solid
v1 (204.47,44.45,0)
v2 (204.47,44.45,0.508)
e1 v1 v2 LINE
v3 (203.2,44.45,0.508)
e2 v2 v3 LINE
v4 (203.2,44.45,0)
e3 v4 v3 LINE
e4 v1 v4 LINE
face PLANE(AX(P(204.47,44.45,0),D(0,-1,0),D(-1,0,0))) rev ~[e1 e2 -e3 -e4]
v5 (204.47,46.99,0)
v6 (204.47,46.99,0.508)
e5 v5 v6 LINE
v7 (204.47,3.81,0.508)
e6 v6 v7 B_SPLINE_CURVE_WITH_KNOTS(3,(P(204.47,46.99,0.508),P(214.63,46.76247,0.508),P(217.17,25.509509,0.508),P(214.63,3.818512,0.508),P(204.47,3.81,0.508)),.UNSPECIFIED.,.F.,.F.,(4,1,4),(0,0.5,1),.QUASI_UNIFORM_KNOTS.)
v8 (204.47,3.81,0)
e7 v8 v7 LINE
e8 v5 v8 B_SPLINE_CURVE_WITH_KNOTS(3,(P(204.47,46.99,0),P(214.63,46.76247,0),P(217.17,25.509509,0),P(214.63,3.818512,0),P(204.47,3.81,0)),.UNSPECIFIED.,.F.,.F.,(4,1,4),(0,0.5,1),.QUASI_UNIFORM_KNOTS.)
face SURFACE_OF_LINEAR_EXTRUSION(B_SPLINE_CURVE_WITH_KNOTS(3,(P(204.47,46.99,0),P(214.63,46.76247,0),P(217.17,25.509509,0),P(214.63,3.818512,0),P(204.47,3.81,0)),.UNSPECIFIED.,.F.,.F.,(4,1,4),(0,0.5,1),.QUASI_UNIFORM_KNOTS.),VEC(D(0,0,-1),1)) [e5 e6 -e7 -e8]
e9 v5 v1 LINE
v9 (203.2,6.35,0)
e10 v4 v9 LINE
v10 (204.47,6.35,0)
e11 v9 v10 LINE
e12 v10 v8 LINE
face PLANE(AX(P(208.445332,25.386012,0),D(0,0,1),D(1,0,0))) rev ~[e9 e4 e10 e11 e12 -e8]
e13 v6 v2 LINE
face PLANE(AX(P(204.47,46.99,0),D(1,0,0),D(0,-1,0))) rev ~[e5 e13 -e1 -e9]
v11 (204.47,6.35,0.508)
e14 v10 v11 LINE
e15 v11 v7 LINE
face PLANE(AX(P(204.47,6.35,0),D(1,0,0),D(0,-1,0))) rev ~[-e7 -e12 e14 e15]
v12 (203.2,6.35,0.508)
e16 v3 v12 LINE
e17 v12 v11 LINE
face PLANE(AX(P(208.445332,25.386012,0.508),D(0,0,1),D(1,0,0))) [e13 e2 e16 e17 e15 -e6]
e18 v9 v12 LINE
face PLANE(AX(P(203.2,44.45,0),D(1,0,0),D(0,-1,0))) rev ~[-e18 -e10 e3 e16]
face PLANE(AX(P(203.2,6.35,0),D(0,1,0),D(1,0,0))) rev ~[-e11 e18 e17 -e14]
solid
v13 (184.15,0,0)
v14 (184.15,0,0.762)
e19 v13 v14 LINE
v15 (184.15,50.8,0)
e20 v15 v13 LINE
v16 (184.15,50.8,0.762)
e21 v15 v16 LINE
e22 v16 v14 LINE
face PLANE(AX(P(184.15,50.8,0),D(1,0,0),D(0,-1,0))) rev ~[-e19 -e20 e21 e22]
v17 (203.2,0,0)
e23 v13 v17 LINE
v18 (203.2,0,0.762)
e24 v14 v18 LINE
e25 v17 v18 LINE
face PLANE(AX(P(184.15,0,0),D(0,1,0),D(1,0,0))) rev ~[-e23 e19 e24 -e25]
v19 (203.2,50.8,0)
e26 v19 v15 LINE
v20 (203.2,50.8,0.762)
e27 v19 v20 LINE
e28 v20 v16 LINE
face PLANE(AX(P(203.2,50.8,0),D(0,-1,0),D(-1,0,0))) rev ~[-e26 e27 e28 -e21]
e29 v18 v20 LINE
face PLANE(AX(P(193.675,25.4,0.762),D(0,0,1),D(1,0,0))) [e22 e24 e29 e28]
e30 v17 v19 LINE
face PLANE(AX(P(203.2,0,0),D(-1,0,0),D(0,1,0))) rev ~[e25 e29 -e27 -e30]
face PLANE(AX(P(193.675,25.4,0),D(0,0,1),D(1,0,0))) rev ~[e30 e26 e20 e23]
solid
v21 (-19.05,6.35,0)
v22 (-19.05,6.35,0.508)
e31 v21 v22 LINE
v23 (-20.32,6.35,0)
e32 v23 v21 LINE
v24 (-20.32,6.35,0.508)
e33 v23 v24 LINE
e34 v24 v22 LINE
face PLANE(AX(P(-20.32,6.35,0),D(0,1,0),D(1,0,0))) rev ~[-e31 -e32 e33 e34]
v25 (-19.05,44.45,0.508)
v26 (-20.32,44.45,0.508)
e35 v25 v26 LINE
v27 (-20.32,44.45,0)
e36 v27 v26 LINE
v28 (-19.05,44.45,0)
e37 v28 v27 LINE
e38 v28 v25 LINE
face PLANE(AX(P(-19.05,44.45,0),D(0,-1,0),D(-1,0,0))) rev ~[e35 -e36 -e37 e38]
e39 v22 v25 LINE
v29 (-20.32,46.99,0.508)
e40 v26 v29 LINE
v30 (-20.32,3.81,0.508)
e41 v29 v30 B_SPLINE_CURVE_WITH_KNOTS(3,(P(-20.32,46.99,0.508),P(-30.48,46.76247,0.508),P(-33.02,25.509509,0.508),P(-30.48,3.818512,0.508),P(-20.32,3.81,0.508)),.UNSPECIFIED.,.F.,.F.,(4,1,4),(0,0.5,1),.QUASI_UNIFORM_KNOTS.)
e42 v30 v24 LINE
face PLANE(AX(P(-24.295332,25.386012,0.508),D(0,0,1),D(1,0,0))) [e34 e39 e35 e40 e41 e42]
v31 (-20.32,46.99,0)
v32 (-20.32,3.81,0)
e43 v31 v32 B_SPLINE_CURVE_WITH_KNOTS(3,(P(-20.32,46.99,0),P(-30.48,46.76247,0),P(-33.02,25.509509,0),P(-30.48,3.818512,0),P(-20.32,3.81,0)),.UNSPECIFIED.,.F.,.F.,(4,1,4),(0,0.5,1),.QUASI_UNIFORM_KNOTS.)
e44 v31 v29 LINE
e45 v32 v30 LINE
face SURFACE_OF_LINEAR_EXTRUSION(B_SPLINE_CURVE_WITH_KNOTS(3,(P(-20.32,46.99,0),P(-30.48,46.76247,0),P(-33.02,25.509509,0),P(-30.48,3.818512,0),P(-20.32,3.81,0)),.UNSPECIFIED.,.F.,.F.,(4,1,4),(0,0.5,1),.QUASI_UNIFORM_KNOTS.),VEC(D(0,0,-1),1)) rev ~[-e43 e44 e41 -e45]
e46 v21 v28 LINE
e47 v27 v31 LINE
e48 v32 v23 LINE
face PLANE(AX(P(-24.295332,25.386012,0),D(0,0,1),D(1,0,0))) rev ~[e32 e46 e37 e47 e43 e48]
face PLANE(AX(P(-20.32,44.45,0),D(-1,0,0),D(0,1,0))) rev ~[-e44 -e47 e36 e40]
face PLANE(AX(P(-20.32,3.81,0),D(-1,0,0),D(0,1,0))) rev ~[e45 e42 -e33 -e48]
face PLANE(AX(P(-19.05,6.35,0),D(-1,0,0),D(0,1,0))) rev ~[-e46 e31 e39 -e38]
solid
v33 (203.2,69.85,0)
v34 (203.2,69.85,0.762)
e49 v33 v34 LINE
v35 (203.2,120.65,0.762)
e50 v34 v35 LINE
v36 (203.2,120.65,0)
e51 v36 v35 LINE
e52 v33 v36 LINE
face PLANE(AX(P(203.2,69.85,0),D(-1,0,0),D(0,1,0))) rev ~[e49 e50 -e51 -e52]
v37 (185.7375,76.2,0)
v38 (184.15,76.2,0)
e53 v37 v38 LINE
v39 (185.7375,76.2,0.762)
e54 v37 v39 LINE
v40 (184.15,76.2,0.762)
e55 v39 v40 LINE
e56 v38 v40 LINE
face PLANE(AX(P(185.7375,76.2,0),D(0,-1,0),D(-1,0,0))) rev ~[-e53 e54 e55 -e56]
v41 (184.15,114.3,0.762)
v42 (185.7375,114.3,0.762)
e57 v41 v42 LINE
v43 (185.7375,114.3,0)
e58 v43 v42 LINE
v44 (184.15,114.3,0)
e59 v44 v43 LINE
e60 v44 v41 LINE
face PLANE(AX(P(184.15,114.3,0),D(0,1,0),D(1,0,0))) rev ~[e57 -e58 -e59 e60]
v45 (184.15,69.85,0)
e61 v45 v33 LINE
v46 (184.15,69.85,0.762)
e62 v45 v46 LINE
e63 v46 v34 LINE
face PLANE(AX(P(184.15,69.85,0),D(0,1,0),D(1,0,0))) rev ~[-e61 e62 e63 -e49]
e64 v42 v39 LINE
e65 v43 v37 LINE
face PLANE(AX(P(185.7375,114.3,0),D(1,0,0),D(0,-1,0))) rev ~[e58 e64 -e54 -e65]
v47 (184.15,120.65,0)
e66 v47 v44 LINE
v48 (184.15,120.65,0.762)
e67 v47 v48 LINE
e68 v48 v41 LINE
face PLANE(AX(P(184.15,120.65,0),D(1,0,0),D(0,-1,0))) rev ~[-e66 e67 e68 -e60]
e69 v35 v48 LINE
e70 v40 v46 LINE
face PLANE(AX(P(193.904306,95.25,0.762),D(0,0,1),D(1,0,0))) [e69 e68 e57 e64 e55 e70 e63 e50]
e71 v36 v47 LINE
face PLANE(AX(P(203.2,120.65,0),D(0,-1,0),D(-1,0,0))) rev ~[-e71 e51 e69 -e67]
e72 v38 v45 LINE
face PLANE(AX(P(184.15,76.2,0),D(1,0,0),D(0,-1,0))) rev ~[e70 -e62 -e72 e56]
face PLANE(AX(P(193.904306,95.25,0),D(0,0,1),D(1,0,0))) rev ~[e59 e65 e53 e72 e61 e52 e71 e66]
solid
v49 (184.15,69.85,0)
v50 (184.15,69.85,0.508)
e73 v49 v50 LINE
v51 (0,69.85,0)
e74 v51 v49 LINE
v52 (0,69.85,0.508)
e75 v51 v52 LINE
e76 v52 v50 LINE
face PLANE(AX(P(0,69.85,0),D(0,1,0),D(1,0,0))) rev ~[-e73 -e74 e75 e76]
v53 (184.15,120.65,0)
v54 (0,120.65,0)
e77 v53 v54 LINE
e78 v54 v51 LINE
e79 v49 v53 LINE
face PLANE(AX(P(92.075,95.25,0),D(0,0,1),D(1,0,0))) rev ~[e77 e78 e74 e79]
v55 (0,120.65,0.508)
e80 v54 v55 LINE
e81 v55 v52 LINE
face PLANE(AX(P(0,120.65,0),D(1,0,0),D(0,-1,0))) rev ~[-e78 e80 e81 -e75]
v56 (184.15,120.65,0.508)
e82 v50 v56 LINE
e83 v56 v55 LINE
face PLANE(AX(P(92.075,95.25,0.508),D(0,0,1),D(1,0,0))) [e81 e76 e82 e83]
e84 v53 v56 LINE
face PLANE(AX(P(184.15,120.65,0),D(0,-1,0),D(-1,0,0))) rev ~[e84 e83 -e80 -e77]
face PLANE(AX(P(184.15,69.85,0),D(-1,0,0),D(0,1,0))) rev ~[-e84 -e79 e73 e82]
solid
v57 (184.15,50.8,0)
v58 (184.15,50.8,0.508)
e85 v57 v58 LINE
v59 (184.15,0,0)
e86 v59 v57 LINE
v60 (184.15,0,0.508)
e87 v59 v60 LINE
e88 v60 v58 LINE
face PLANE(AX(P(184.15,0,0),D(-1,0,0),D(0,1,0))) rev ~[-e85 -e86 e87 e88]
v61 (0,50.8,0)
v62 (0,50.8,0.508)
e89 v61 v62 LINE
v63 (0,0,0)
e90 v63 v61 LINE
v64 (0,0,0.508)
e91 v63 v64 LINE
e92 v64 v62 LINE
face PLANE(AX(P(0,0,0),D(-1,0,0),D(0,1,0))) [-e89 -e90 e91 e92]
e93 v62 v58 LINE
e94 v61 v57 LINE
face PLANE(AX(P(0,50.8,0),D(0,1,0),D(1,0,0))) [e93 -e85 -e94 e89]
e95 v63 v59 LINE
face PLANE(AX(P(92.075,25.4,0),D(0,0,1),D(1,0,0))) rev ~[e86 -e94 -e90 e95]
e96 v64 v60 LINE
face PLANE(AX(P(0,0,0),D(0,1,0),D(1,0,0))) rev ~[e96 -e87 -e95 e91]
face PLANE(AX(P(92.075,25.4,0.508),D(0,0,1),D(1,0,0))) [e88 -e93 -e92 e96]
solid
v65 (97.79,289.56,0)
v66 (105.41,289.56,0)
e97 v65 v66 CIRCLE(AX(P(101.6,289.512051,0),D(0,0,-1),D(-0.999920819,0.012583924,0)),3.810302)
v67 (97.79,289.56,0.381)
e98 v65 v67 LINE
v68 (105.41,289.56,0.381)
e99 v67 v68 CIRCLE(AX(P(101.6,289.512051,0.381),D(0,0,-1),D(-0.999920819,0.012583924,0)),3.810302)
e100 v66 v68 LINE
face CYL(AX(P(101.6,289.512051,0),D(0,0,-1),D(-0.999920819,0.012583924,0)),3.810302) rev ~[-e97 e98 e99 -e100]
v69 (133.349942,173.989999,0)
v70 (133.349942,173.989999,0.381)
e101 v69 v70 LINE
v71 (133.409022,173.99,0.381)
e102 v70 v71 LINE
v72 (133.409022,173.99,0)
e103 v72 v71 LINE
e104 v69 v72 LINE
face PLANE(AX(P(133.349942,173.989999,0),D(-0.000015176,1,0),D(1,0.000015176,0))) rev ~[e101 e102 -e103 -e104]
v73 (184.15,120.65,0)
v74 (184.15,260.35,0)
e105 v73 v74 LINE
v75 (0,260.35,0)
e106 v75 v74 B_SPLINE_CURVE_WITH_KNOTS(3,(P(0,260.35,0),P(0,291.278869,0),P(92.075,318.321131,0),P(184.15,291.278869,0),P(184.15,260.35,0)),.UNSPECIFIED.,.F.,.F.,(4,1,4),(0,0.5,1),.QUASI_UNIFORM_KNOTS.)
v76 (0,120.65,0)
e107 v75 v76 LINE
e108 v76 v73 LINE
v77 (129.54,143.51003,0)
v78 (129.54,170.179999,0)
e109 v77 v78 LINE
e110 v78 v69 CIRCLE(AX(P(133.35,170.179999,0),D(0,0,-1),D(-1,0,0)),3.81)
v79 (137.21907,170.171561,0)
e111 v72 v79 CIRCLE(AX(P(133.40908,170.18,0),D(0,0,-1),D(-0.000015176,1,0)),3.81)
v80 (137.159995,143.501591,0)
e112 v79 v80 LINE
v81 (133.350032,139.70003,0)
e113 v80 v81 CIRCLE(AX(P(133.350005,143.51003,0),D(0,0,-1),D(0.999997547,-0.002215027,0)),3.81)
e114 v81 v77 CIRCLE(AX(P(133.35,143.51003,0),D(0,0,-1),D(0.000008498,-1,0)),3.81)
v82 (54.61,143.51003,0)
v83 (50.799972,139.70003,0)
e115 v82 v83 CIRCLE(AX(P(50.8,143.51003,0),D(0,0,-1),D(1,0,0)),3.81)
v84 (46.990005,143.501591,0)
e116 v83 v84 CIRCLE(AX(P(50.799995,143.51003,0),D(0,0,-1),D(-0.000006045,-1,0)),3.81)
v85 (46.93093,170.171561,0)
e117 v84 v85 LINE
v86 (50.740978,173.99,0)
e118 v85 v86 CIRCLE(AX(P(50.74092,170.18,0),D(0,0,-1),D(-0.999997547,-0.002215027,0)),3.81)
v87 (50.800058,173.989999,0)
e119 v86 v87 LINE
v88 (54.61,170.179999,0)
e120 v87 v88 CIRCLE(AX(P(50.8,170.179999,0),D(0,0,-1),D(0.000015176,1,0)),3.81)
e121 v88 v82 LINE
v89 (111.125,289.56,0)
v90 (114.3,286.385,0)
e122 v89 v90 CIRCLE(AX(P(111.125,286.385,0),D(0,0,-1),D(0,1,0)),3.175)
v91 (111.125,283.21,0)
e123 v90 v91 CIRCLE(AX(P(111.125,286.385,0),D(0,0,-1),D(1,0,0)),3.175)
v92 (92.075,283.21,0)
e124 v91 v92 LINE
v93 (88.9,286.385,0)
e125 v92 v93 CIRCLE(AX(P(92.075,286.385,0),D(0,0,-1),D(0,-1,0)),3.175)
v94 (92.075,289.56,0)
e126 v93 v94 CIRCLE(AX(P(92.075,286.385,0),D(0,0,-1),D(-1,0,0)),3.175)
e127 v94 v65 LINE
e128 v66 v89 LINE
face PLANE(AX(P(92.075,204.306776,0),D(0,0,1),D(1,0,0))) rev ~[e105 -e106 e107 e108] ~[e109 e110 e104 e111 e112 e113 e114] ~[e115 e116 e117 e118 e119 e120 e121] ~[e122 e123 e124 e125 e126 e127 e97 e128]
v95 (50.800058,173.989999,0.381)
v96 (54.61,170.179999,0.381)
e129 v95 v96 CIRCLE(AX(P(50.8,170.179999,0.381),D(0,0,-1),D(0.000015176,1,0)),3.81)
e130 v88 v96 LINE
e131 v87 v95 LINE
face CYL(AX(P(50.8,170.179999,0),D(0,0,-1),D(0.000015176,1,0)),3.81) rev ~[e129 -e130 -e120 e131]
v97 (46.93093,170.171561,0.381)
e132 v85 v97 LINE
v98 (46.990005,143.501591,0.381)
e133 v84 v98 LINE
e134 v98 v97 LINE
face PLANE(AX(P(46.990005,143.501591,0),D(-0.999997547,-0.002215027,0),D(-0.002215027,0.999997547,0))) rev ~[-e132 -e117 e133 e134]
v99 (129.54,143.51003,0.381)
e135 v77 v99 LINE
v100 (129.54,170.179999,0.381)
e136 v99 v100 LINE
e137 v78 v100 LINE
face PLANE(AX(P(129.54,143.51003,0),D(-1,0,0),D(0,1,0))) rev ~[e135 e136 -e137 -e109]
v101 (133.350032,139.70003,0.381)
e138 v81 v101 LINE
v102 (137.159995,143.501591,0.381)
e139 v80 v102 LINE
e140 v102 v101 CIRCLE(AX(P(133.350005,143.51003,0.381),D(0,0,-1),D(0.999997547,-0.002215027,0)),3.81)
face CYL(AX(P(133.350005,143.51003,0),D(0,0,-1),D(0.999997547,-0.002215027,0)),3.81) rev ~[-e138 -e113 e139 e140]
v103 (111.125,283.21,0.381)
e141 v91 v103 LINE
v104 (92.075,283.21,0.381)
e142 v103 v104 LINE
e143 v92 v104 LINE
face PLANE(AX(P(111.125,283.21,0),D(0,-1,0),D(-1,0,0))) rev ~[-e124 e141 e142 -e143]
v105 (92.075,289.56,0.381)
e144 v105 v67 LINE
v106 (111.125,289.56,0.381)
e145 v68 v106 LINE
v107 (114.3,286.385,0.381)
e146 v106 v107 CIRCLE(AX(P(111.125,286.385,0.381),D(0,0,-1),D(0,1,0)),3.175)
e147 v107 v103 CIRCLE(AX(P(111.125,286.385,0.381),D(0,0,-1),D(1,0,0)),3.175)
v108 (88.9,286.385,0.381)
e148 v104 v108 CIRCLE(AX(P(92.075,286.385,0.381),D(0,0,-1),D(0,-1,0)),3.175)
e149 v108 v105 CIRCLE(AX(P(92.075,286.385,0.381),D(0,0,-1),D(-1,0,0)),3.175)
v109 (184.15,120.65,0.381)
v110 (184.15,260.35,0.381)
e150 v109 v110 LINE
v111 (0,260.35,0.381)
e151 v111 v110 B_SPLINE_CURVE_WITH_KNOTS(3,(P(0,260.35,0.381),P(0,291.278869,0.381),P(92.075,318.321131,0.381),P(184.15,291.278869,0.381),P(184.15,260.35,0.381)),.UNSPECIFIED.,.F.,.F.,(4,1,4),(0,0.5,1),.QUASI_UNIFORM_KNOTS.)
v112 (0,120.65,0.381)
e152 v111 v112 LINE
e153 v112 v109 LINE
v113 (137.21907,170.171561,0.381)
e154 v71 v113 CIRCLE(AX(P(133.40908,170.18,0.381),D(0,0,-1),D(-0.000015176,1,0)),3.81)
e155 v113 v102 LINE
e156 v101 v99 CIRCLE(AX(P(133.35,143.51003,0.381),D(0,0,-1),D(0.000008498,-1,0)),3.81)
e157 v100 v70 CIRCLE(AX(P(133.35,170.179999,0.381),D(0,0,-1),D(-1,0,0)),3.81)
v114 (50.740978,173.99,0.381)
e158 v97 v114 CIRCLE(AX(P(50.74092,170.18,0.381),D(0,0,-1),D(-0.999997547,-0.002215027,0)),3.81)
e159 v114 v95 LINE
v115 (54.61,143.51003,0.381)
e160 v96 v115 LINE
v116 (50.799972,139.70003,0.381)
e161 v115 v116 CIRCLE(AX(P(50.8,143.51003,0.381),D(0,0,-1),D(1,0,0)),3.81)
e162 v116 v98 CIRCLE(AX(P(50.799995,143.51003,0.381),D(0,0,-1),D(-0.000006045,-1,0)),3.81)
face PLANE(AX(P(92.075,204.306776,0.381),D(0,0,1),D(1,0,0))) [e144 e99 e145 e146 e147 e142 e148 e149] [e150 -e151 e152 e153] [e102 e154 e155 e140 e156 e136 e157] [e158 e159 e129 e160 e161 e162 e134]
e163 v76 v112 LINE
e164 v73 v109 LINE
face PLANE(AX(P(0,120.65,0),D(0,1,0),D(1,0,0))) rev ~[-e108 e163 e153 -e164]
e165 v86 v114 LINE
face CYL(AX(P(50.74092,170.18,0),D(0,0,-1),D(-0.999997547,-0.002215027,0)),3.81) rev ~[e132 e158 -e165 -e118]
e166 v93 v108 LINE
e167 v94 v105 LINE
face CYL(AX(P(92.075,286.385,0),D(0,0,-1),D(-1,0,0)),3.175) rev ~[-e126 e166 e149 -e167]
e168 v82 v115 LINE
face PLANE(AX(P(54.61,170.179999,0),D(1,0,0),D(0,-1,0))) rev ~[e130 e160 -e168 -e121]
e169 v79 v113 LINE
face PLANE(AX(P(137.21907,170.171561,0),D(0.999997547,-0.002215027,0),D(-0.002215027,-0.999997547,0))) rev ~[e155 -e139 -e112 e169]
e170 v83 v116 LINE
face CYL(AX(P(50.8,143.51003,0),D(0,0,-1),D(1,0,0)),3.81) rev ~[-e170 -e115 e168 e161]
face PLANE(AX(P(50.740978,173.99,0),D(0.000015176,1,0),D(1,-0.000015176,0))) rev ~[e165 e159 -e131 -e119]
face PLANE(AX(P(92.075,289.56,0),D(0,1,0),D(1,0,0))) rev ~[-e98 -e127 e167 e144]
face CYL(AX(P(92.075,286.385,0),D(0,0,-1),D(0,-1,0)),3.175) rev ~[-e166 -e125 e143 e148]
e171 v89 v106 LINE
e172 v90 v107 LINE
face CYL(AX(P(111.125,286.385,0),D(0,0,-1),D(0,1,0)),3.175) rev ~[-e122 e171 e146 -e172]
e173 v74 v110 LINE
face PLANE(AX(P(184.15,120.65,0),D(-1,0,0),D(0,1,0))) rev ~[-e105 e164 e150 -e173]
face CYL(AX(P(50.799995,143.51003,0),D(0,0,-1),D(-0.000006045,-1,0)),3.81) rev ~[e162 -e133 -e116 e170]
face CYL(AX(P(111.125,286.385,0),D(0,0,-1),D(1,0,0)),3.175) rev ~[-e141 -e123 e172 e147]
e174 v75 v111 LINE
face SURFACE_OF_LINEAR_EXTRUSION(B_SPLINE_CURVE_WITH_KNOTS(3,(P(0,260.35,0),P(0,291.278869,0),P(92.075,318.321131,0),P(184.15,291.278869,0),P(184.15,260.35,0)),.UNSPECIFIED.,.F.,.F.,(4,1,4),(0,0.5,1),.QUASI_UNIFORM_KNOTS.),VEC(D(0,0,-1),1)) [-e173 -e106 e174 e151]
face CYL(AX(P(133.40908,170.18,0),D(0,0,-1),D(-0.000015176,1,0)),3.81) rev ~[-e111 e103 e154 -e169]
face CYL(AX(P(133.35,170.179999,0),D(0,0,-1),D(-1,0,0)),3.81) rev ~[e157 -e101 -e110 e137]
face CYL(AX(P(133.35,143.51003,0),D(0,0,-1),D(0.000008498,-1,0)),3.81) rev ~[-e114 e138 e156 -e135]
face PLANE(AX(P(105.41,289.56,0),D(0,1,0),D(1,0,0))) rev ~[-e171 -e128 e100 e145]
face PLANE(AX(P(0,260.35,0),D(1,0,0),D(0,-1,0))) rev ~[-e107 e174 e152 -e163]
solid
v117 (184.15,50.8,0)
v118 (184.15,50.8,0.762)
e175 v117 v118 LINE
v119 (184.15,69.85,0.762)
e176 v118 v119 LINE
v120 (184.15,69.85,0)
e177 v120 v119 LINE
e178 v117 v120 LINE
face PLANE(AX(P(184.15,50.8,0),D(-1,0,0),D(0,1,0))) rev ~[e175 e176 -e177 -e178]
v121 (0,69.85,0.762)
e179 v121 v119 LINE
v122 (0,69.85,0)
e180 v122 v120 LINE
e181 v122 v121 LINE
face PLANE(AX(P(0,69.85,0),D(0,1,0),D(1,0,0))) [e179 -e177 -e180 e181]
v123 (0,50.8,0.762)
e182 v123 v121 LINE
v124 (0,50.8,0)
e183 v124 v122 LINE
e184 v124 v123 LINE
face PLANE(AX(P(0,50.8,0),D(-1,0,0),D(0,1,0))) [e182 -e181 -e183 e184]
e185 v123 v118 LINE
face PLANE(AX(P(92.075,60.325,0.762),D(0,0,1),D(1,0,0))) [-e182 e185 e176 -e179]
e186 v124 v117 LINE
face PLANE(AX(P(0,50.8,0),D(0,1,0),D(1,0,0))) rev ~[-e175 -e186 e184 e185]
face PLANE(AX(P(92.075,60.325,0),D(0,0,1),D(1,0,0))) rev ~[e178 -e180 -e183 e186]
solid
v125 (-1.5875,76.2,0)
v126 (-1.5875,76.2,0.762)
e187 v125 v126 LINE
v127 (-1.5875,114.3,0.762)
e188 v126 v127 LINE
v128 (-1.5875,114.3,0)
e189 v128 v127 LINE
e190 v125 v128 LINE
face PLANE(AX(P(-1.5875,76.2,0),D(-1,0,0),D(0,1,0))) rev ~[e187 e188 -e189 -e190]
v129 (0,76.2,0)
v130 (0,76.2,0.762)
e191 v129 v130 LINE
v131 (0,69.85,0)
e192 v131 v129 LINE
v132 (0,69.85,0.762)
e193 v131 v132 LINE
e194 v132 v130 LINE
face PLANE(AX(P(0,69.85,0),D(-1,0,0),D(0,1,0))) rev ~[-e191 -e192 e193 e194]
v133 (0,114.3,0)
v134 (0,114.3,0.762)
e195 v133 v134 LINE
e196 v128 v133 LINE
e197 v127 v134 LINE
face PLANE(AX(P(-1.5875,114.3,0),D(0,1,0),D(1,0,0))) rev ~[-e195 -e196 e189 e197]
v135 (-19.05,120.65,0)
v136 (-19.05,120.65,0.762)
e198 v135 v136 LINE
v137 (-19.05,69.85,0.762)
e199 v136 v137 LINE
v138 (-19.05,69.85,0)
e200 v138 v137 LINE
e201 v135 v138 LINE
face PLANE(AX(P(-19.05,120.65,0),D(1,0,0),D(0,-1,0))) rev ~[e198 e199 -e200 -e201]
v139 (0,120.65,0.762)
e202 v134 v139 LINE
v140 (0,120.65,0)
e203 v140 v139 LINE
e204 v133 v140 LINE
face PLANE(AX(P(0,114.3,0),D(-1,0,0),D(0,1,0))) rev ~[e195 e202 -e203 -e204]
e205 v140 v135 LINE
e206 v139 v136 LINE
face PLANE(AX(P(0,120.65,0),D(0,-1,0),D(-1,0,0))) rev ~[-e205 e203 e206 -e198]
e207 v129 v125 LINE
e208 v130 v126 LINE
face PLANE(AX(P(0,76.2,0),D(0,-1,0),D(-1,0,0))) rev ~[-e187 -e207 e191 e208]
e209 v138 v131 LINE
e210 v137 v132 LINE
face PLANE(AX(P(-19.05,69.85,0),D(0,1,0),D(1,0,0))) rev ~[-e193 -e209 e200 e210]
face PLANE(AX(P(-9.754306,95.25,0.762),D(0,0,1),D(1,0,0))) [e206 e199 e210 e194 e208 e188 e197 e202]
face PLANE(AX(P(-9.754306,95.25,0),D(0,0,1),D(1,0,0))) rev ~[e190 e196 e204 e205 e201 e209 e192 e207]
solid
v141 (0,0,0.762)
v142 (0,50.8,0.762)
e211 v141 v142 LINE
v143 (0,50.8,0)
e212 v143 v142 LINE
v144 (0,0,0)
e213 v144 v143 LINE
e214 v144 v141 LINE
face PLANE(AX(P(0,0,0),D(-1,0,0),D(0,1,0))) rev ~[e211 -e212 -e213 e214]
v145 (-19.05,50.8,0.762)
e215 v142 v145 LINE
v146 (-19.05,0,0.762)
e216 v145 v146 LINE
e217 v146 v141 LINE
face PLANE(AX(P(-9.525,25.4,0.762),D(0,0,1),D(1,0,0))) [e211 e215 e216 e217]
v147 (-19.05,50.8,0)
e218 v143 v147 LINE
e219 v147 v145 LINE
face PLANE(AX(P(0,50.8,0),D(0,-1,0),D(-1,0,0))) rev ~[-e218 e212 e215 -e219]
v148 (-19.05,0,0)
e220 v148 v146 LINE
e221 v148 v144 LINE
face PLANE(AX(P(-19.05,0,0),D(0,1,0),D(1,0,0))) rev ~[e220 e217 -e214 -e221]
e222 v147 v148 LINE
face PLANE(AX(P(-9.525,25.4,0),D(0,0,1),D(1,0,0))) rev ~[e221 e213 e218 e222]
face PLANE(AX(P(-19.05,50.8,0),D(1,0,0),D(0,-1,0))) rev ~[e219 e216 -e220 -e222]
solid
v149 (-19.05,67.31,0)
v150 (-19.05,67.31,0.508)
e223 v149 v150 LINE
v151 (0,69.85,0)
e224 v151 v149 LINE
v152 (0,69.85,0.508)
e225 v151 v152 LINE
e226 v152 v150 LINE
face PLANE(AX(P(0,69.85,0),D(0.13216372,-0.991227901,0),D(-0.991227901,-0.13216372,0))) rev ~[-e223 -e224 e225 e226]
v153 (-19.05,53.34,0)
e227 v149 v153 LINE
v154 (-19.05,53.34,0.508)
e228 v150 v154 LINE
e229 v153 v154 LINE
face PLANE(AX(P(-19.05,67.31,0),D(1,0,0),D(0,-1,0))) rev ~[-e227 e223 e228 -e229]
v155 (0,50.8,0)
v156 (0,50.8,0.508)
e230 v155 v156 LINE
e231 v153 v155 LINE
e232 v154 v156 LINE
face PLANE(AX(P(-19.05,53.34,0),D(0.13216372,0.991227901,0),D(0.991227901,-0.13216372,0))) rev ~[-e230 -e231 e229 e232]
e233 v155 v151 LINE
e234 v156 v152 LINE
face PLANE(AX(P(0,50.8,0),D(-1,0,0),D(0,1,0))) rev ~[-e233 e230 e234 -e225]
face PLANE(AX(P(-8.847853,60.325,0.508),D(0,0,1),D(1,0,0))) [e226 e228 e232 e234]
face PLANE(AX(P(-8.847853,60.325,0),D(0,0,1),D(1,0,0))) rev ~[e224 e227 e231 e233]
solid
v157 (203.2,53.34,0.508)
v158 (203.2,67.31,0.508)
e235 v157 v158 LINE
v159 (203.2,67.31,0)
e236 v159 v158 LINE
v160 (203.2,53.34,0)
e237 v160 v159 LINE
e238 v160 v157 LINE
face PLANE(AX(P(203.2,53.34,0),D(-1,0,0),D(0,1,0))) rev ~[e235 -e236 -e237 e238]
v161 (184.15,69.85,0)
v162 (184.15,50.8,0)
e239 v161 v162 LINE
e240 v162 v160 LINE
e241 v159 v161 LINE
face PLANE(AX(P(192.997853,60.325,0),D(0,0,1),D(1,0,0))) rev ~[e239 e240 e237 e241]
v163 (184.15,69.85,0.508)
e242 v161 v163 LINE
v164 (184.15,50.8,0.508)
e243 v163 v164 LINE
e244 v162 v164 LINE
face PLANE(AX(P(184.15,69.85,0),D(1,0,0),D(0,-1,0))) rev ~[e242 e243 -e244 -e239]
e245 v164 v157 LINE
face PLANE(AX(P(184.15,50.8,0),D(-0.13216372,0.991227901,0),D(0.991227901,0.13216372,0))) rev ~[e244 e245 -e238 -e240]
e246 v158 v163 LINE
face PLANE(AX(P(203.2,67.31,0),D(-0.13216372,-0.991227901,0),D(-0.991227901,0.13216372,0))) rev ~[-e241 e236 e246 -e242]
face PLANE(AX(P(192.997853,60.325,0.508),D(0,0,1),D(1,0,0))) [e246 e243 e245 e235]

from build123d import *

# Parameters (mm, degrees)
F0_W     = 184.15
F0_H     = 50.8
F1_DEPTH = 0.508
F0_H_2   = 19.05
F2_DEPTH = 0.762
F3_DEPTH = 0.381


# Not quite as in the source:
# - ends of sketch curves that miss each other by under 0.0002 mm in the source are joined


with BuildPart() as f1:
    # F0 (on Top) → F1 (new body)
    with BuildSketch(Plane.XY):
        with Locations((92.075, 25.4)):
            Rectangle(F0_W, F0_H)
    extrude(amount=F1_DEPTH)


with BuildPart() as f1b:
    # F0 (on Top) → F1, piece 2 (new body)
    with BuildSketch(Plane.XY):
        Polygon((-19.05, 53.34), (0, 50.8), (0, 69.85), (-19.05, 67.31), align=None)
    extrude(amount=F1_DEPTH)


with BuildPart() as f1c:
    # F0 (on Top) → F1, piece 3 (new body)
    with BuildSketch(Plane.XY):
        Polygon((184.15, 69.85), (184.15, 50.8), (203.2, 53.34), (203.2, 67.31), align=None)
    extrude(amount=F1_DEPTH)


with BuildPart() as f1d:
    # F0 (on Top) → F1, piece 4 (new body)
    with BuildSketch(Plane.XY):
        Polygon((0, 76.2), (0, 69.85), (184.15, 69.85), (184.15, 76.2), (184.15, 114.3), (184.15, 120.65), (0, 120.65), (0, 114.3), align=None)
    extrude(amount=F1_DEPTH)


with BuildPart() as f1e:
    # F0 (on Top) → F1, piece 5 (new body)
    with BuildSketch(Plane.XY):
        with BuildLine():
            Line((203.2, 44.45), (203.2, 6.35))
            Line((203.2, 6.35), (204.47, 6.35))
            Line((204.47, 6.35), (204.47, 3.81))
            add(Edge.make_bspline(
                [(204.47, 46.99), (214.63, 46.762470156), (217.17, 25.5095088242), (214.63, 3.8185121957), (204.47, 3.81)],
                knots=[0, 0, 0, 0, 0.5, 1, 1, 1, 1], degree=3))
            Line((204.47, 46.99), (204.47, 44.45))
            Line((204.47, 44.45), (203.2, 44.45))
        make_face()
    extrude(amount=F1_DEPTH)


with BuildPart() as f1f:
    # F0 (on Top) → F1, piece 6 (new body)
    with BuildSketch(Plane.XY):
        with BuildLine():
            Line((-19.05, 6.35), (-19.05, 44.45))
            Line((-19.05, 44.45), (-20.32, 44.45))
            Line((-20.32, 44.45), (-20.32, 46.99))
            add(Edge.make_bspline(
                [(-20.32, 46.99), (-30.48, 46.762470156), (-33.02, 25.5095088242), (-30.48, 3.8185121957), (-20.32, 3.81)],
                knots=[0, 0, 0, 0, 0.5, 1, 1, 1, 1], degree=3))
            Line((-20.32, 3.81), (-20.32, 6.35))
            Line((-20.32, 6.35), (-19.05, 6.35))
        make_face()
    extrude(amount=F1_DEPTH)


with BuildPart() as f2:
    # F0 (on Top) → F2 (new body)
    with BuildSketch(Plane.XY):
        with Locations((92.075, 60.325)):
            Rectangle(F0_W, F0_H_2)
    extrude(amount=F2_DEPTH)


with BuildPart() as f2b:
    # F0 (on Top) → F2, piece 2 (new body)
    with BuildSketch(Plane.XY):
        Polygon((184.15, 76.2), (184.15, 69.85), (203.2, 69.85), (203.2, 120.65), (184.15, 120.65), (184.15, 114.3), (185.7375, 114.3), (185.7375, 76.2), align=None)
    extrude(amount=F2_DEPTH)


with BuildPart() as f2c:
    # F0 (on Top) → F2, piece 3 (new body)
    with BuildSketch(Plane.XY):
        Polygon((184.15, 50.8), (184.15, 0), (203.2, 0), (203.2, 6.35), (203.2, 44.45), (203.2, 50.8), align=None)
    extrude(amount=F2_DEPTH)


with BuildPart() as f2d:
    # F0 (on Top) → F2, piece 4 (new body)
    with BuildSketch(Plane.XY):
        Polygon((-19.05, 0), (0, 0), (0, 50.8), (-19.05, 50.8), (-19.05, 44.45), (-19.05, 6.35), (-19.05, 3.81), align=None)
    extrude(amount=F2_DEPTH)


with BuildPart() as f2e:
    # F0 (on Top) → F2, piece 5 (new body)
    with BuildSketch(Plane.XY):
        Polygon((-19.05, 69.85), (0, 69.85), (0, 76.2), (-1.5875, 76.2), (-1.5875, 114.3), (0, 114.3), (0, 120.65), (-19.05, 120.65), align=None)
    extrude(amount=F2_DEPTH)


with BuildPart() as f3:
    # F0 (on Top) → F3 (new body)
    with BuildSketch(Plane.XY):
        with BuildLine():
            Line((0, 260.35), (0, 120.65))
            Line((0, 120.65), (184.15, 120.65))
            Line((184.15, 120.65), (184.15, 260.35))
            add(Edge.make_bspline(
                [(0, 260.35), (0, 291.2788689137), (92.075, 318.3211310863), (184.15, 291.2788689137), (184.15, 260.35)],
                knots=[0, 0, 0, 0, 0.5, 1, 1, 1, 1], degree=3))
        make_face()
        with BuildLine():
            ThreePointArc((54.61, 143.5100303088), (53.4940670417, 140.8159436779), (50.7999722968, 139.7000303089))
            ThreePointArc((50.7999722968, 139.7000303089), (48.1088940654, 140.8129811804), (46.9900046733, 143.5015910564))
            Line((46.9900046733, 143.5015910564), (46.9309298286, 170.171560748))
            ThreePointArc((46.9309298286, 170.171560748), (48.0438819902, 172.8711119219), (50.7409783035, 173.99))
            Line((50.7409783035, 173.99), (50.8000578216, 173.9899991034))
            ThreePointArc((50.8000578216, 173.9899991034), (53.4940972793, 172.8740554971), (54.61, 170.1799991038))
            Line((54.61, 170.1799991038), (54.61, 143.5100303088))
        make_face(mode=Mode.SUBTRACT)
        with BuildLine():
            Line((129.54, 143.5100303088), (129.54, 170.1799991038))
            ThreePointArc((129.54, 170.1799991038), (130.6559027207, 172.8740554971), (133.3499421784, 173.9899991034))
            Line((133.3499421784, 173.9899991034), (133.4090216965, 173.99))
            ThreePointArc((133.4090216965, 173.99), (136.1061180098, 172.8711119219), (137.2190701714, 170.171560748))
            Line((137.2190701714, 170.171560748), (137.1599953267, 143.5015910564))
            ThreePointArc((137.1599953267, 143.5015910564), (136.0411059346, 140.8129811804), (133.3500323765, 139.7000303089))
            ThreePointArc((133.3500323765, 139.7000303089), (130.6559329583, 140.8159436779), (129.54, 143.5100303088))
        make_face(mode=Mode.SUBTRACT)
        with BuildLine():
            Line((111.125, 283.21), (92.075, 283.21))
            ThreePointArc((92.075, 283.21), (89.8299359697, 284.1399359697), (88.9, 286.385))
            ThreePointArc((88.9, 286.385), (89.8299359697, 288.6300640303), (92.075, 289.56))
            Line((92.075, 289.56), (97.79, 289.56))
            ThreePointArc((97.79, 289.56), (101.6, 293.3223531569), (105.41, 289.56))
            Line((105.41, 289.56), (111.125, 289.56))
            ThreePointArc((111.125, 289.56), (113.3700640303, 288.6300640303), (114.3, 286.385))
            ThreePointArc((114.3, 286.385), (113.3700640303, 284.1399359697), (111.125, 283.21))
        make_face(mode=Mode.SUBTRACT)
    extrude(amount=F3_DEPTH)


solid = Compound([f1.part, f1b.part, f1c.part, f1d.part, f1e.part, f1f.part, f2.part, f2b.part, f2c.part, f2d.part, f2e.part, f3.part])
